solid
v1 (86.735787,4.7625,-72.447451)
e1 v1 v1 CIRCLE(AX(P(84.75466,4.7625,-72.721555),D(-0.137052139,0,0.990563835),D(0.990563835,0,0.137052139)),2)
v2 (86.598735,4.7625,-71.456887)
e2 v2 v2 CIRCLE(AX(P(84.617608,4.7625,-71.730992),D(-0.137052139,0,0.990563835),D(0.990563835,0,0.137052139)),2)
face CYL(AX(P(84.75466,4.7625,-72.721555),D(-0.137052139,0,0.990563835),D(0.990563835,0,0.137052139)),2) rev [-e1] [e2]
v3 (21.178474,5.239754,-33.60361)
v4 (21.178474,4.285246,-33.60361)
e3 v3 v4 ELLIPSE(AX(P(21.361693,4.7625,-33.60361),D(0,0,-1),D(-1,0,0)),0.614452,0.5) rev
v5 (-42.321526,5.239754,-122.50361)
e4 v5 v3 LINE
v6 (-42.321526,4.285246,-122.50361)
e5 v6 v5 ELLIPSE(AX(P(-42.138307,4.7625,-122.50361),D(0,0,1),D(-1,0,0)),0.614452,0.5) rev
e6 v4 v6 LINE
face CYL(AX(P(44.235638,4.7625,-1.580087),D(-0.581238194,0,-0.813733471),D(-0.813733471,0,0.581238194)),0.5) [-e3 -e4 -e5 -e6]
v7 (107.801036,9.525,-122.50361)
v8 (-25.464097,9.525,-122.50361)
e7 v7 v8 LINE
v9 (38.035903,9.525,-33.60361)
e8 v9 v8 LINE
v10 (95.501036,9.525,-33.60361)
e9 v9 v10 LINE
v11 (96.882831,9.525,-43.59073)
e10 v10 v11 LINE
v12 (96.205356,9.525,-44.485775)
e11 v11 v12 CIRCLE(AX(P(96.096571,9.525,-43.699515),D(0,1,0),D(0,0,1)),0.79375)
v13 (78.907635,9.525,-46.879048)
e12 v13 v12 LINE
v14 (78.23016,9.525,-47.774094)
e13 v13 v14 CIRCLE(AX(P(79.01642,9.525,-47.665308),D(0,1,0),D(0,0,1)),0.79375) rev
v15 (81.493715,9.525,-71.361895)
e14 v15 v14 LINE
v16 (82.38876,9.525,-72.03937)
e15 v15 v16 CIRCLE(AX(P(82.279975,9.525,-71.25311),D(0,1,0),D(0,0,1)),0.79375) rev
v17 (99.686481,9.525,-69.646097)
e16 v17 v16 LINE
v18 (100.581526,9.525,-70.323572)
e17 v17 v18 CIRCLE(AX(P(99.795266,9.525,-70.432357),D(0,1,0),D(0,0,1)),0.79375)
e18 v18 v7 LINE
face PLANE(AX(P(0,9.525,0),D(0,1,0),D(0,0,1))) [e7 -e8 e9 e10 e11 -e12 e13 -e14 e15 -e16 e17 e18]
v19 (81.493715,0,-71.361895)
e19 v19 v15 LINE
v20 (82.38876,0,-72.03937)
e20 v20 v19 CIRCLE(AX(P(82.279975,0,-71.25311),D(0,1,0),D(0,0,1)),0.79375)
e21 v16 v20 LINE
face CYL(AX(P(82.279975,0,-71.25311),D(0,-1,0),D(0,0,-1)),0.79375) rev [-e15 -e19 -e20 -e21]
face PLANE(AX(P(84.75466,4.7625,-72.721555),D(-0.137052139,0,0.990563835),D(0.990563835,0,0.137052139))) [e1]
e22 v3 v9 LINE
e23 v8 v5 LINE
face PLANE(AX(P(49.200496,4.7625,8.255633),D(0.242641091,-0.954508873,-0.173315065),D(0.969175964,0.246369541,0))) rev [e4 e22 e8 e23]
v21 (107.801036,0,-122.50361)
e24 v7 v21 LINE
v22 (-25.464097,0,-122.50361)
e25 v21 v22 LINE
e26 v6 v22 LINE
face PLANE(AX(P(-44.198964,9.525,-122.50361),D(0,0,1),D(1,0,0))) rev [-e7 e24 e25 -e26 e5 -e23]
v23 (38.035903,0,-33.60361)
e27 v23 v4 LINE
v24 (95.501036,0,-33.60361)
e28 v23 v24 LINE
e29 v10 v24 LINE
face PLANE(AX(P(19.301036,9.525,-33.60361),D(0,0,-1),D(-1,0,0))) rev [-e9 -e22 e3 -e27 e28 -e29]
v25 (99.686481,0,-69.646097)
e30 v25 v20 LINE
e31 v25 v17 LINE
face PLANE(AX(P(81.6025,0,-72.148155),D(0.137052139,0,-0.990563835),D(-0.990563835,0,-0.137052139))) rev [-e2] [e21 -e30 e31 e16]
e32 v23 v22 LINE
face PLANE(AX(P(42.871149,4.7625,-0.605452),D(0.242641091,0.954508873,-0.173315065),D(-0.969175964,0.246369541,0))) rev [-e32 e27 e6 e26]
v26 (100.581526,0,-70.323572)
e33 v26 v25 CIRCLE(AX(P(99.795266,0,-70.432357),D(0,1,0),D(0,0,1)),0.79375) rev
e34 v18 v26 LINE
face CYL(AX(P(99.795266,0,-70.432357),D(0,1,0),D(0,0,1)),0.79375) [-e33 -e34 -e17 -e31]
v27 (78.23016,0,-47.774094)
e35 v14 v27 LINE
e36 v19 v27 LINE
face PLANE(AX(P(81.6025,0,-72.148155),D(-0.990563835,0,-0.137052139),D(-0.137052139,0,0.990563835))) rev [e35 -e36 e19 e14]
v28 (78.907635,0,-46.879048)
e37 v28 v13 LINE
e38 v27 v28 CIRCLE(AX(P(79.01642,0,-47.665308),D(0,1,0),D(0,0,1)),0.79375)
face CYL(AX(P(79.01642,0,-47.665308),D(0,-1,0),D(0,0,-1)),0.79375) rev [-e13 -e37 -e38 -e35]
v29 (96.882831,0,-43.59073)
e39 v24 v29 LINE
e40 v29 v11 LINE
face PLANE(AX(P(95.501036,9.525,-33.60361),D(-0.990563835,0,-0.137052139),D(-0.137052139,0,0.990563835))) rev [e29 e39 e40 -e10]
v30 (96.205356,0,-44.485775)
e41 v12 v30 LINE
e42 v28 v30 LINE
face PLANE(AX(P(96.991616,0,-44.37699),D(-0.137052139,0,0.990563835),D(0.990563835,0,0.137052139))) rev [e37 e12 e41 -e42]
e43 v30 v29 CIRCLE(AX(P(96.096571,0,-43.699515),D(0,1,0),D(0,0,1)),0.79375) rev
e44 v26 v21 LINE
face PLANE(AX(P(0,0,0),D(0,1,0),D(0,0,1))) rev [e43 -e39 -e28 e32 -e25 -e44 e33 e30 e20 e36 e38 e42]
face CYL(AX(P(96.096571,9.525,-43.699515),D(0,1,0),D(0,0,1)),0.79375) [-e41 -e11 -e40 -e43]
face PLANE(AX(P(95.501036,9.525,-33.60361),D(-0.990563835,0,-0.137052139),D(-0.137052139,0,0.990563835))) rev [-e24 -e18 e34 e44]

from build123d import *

# Parameters (mm, degrees)
BOSS_EXTRUDE1_DEPTH = 9.525
CUT_EXTRUDE11_DEPTH = 109.249530891
CUT_EXTRUDE12_DEPTH = 109.249530891
CUT_EXTRUDE1_DEPTH  = 164.459241155
FILLET25_R          = 0.79375
CUT_EXTRUDE8_DEPTH  = 7.112
FILLET31_R          = 0.79375
FILLET32_R          = 0.5
DELETEFACE2_START   = 2.413
DELETEFACE2_DEPTH   = 8.587
DELETEFACE2_2_DEPTH = 9.525
DELETEFACE3_START   = 2.413
DELETEFACE3_DEPTH   = 7.112
SKETCH42_R          = 2
CUT_EXTRUDE13_DEPTH = 1


with BuildPart() as part:
    # Sketch2 → Boss-Extrude1 (new body)
    with BuildSketch(Plane(origin=(0, 0, 0), x_dir=(1, 0, 0), z_dir=(0, 1, 0))):
        Polygon((95.501036211, 33.603610094), (107.801036211, 122.503610094), (-44.198963789, 122.503610094), (19.301036211, 33.603610094), align=None)
    extrude(amount=BOSS_EXTRUDE1_DEPTH)

    # Sketch40 → Cut-Extrude11 (cut, along a direction that is not the sketch's normal)
    with BuildSketch(Plane(origin=(0, 0, -122.503610094), x_dir=(-1, 0, 0), z_dir=(0, 0, -1))):
        Polygon((44.198963789, 4.7625), (25.464097027, 0), (44.198963789, 0), align=None)
    extrude(amount=-CUT_EXTRUDE11_DEPTH, dir=(-0.5812381937190961, 0, -0.8137334712067352), mode=Mode.SUBTRACT)

    # Sketch41 → Cut-Extrude12 (cut, along a direction that is not the sketch's normal)
    with BuildSketch(Plane(origin=(0, 0, -122.503610094), x_dir=(-1, 0, 0), z_dir=(0, 0, -1))):
        Polygon((44.198963789, 4.7625), (44.198963789, 9.525), (25.464097027, 9.525), align=None)
    extrude(amount=-CUT_EXTRUDE12_DEPTH, dir=(-0.5812381937190961, 0, -0.8137334712067352), mode=Mode.SUBTRACT)

    # Sketch3 → Cut-Extrude1 (cut, through all)
    with BuildSketch(Plane(origin=(0, 9.525, 0), x_dir=(1, 0, 0), z_dir=(0, 1, 0))):
        Polygon((96.991616373, 44.376990288), (78.121375316, 46.987833539), (81.602499651, 72.148154947), (100.472740707, 69.537311696), align=None)
    extrude(amount=-CUT_EXTRUDE1_DEPTH, mode=Mode.SUBTRACT)

    # Fillet25
    fillet25_edges = [part.edges().sort_by_distance(p)[0] for p in [
        (100.472740707, 4.7625, -69.537311696),
        (96.991616373, 4.7625, -44.376990288),
        (78.121375316, 4.7625, -46.987833539),
        (81.602499651, 4.7625, -72.148154947),
    ]]
    fillet(fillet25_edges, radius=FILLET25_R)

    # Sketch4 → Cut-Extrude8 (cut)
    with BuildSketch(Plane(origin=(0, 9.525, 0), x_dir=(1, 0, 0), z_dir=(0, 1, 0))):
        with BuildLine():
            Line((91.432981633, 84.938583056), (91.87398018, 88.3325177))
            ThreePointArc((91.87398018, 88.3325177), (91.880119161, 88.935768076), (91.743819438, 89.523450889))
            Line((91.743819438, 89.523450889), (84.365995583, 109.929022071))
            ThreePointArc((84.365995583, 109.929022071), (84.052194516, 110.530485922), (83.590381446, 111.027435178))
            Line((83.590381446, 111.027435178), (69.63117281, 122.503610094))
            Line((69.63117281, 122.503610094), (65.631546235, 122.503610094))
            Line((65.631546235, 122.503610094), (81.977330858, 109.065378145))
            Line((81.977330858, 109.065378145), (88.524922018, 90.956062972))
            ThreePointArc((88.524922018, 90.956062972), (86.871368444, 87.055321455), (82.635738177, 86.958058718))
            ThreePointArc((82.635738177, 86.958058718), (82.108570303, 87.435753172), (81.573856943, 87.904986143))
            ThreePointArc((81.573856943, 87.904986143), (80.279037974, 88.75135311), (78.792534366, 89.179372068))
            Line((78.792534366, 89.179372068), (71.259162002, 90.172380139))
            Line((71.259162002, 90.172380139), (70.399965305, 83.95114873))
            Line((70.399965305, 83.95114873), (68.995626594, 73.78267842))
            Line((68.995626594, 73.78267842), (81.599351809, 72.105893611))
            Line((81.599351809, 72.105893611), (81.450209567, 70.968016338))
            Line((81.450209567, 70.968016338), (82.559812791, 70.82309653))
            Line((82.559812791, 70.82309653), (82.351161676, 69.22552369))
            Line((82.351161676, 69.22552369), (86.280730255, 68.712302106))
            Line((86.280730255, 68.712302106), (86.63642856, 71.435766832))
            Line((86.63642856, 71.435766832), (89.626769646, 71.037935364))
            Line((89.626769646, 71.037935364), (91.432981633, 84.938583056))
        make_face()
    extrude(amount=-CUT_EXTRUDE8_DEPTH, mode=Mode.SUBTRACT)

    # Fillet31
    # the kernel refuses this fillet: 0.79375 mm, written as the material it adds along each edge
    with BuildSketch(Plane(origin=(71.259162002, 9.525, -90.172380139), x_dir=(0.9914240578116118, 0, 0.13068411377194142), z_dir=(0, -1, 0))) as fillet31_piece_1:
        with BuildLine():
            CenterArc((FILLET31_R * 0.993838975456, FILLET31_R), FILLET31_R, 180.35409036, 89.64590964)
            Line((-FILLET31_R * 0.00614192814136, FILLET31_R * 0.993819996707), (0, 0))
            Line((0, 0), (FILLET31_R * 0.993838975456, 0))
        make_face()
    extrude(amount=9.084149217)
    with BuildSketch(Plane(origin=(68.995626594, 9.525, -73.78267842), x_dir=(0.13680862211806724, 0, -0.9905974969250406), z_dir=(0, -1, 0))) as fillet31_piece_2:
        with BuildLine():
            CenterArc((FILLET31_R * 1.00498928997, FILLET31_R), FILLET31_R, 179.714846688, 90.285153312)
            Line((FILLET31_R * 0.00500167453449, FILLET31_R * 1.00497684362), (0, 0))
            Line((0, 0), (FILLET31_R * 1.00498928997, 0))
        make_face()
    extrude(amount=9.106275622)
    # the kernel refuses this fillet: 0.79375 mm, written as the material it takes off along each edge
    with BuildSketch(Plane(origin=(89.626769646, 11.493028645, -71.037935364), x_dir=(0.9905638349724125, 0, 0.13705213914692133), z_dir=(0, -1, 0))) as fillet31_2_piece_1:
        with BuildLine():
            CenterArc((FILLET31_R * 0.991762466743, -FILLET31_R), FILLET31_R, 90, 89.526074815)
            Line((-FILLET31_R * 0.00820332414174, -FILLET31_R * 0.991728539427), (0, 0))
            Line((0, 0), (FILLET31_R * 0.991762466743, 0))
        make_face()
    extrude(amount=9.080028645, mode=Mode.SUBTRACT)
    with BuildSketch(Plane(origin=(81.599351809, 11.470712134, -72.105893611), x_dir=(-0.99126610392599, 0, -0.1318768789719729), z_dir=(0, -1, 0))) as fillet31_2_piece_2:
        with BuildLine():
            CenterArc((0.778284853, -0.79375), FILLET31_R, 90, 79.138737607)
            Line((-0.001246175, -0.644182498), (0, 0))
            Line((0, 0), (0.778284853, 0))
        make_face()
    extrude(amount=9.057712134, mode=Mode.SUBTRACT)

    # Fillet32
    fillet32_edges = [part.edges().sort_by_distance(p)[0] for p in [
        (-12.448963789, 4.7625, -78.053610094),
    ]]
    fillet(fillet32_edges, radius=FILLET32_R)

    # DeleteFace2: read off the stored shape, not the designer's step
    # DeleteFace2 outline → DeleteFace2 (cut)
    with BuildSketch(Plane(origin=(0, 0, 0), x_dir=(1, 0, 0), z_dir=(0, 1, 0)).offset(DELETEFACE2_START)):
        with BuildLine():
            Line((71.259162002, 90.172380139), (71.151239195, 89.390937708))
            ThreePointArc((71.151239195, 89.390937708), (71.456370289, 89.91363683), (72.041256474, 90.06928871))
            Line((72.041256474, 90.06928871), (71.259162002, 90.172380139))
        make_face()
        with BuildLine():
            Line((68.995626594, 73.78267842), (69.786369725, 73.677478882))
            ThreePointArc((69.786369725, 73.677478882), (69.259466687, 73.983520547), (69.104760234, 74.572888196))
            Line((69.104760234, 74.572888196), (68.995626594, 73.78267842))
        make_face()
    extrude(amount=DELETEFACE2_DEPTH, mode=Mode.SUBTRACT)

    # DeleteFace2 2 outline → DeleteFace2 2 (add)
    with BuildSketch(Plane(origin=(0, 0, 0), x_dir=(1, 0, 0), z_dir=(0, 1, 0))):
        with BuildLine():
            ThreePointArc((80.827864414, 72.208531388), (81.305090173, 71.961554565), (81.515634323, 71.467172994))
            ThreePointArc((81.515634323, 71.467172994), (81.745680073, 71.840109312), (82.138550491, 72.034159252))
            Line((82.138550491, 72.034159252), (80.827864414, 72.208531388))
        make_face()
    extrude(amount=DELETEFACE2_2_DEPTH)

    # DeleteFace3: read off the stored shape, not the designer's step
    # DeleteFace3 outline → DeleteFace3 (add)
    with BuildSketch(Plane(origin=(0, 0, 0), x_dir=(1, 0, 0), z_dir=(0, 1, 0)).offset(DELETEFACE3_START)):
        with BuildLine():
            Line((82.388759695, 72.039369812), (90.406552846, 70.93004635))
            ThreePointArc((90.406552846, 70.93004635), (89.884432105, 71.234645894), (89.728205023, 71.818584289))
            Line((89.728205023, 71.818584289), (91.87398018, 88.3325177))
            ThreePointArc((91.87398018, 88.3325177), (91.880119161, 88.935768076), (91.743819438, 89.523450889))
            Line((91.743819438, 89.523450889), (84.365995583, 109.929022071))
            ThreePointArc((84.365995583, 109.929022071), (84.052194516, 110.530485922), (83.590381446, 111.027435178))
            Line((83.590381446, 111.027435178), (69.63117281, 122.503610094))
            Line((69.63117281, 122.503610094), (65.631546235, 122.503610094))
            Line((65.631546235, 122.503610094), (81.977330858, 109.065378145))
            Line((81.977330858, 109.065378145), (88.524922018, 90.956062972))
            ThreePointArc((88.524922018, 90.956062972), (86.871368444, 87.055321455), (82.635738177, 86.958058718))
            ThreePointArc((82.635738177, 86.958058718), (82.108570303, 87.435753172), (81.573856943, 87.904986143))
            ThreePointArc((81.573856943, 87.904986143), (80.279037974, 88.75135311), (78.792534366, 89.179372068))
            Line((78.792534366, 89.179372068), (71.259162002, 90.172380139))
            Line((71.259162002, 90.172380139), (68.995626594, 73.78267842))
            Line((68.995626594, 73.78267842), (82.138550491, 72.034159252))
            ThreePointArc((82.138550491, 72.034159252), (82.263448445, 72.04668771), (82.388759695, 72.039369812))
        make_face()
    extrude(amount=DELETEFACE3_DEPTH)

    # Sketch42 → Cut-Extrude13 (cut)
    with BuildSketch(Plane(origin=(11.327516936, 0, -81.871240295), x_dir=(0.9905638349724135, 0, 0.13705213914691416), z_dir=(-0.13705213914691416, 0, 0.9905638349724135))):
        with Locations((73.988256108, 4.7625)):
            Circle(SKETCH42_R)
    extrude(amount=-CUT_EXTRUDE13_DEPTH, mode=Mode.SUBTRACT)


solid = part.part
